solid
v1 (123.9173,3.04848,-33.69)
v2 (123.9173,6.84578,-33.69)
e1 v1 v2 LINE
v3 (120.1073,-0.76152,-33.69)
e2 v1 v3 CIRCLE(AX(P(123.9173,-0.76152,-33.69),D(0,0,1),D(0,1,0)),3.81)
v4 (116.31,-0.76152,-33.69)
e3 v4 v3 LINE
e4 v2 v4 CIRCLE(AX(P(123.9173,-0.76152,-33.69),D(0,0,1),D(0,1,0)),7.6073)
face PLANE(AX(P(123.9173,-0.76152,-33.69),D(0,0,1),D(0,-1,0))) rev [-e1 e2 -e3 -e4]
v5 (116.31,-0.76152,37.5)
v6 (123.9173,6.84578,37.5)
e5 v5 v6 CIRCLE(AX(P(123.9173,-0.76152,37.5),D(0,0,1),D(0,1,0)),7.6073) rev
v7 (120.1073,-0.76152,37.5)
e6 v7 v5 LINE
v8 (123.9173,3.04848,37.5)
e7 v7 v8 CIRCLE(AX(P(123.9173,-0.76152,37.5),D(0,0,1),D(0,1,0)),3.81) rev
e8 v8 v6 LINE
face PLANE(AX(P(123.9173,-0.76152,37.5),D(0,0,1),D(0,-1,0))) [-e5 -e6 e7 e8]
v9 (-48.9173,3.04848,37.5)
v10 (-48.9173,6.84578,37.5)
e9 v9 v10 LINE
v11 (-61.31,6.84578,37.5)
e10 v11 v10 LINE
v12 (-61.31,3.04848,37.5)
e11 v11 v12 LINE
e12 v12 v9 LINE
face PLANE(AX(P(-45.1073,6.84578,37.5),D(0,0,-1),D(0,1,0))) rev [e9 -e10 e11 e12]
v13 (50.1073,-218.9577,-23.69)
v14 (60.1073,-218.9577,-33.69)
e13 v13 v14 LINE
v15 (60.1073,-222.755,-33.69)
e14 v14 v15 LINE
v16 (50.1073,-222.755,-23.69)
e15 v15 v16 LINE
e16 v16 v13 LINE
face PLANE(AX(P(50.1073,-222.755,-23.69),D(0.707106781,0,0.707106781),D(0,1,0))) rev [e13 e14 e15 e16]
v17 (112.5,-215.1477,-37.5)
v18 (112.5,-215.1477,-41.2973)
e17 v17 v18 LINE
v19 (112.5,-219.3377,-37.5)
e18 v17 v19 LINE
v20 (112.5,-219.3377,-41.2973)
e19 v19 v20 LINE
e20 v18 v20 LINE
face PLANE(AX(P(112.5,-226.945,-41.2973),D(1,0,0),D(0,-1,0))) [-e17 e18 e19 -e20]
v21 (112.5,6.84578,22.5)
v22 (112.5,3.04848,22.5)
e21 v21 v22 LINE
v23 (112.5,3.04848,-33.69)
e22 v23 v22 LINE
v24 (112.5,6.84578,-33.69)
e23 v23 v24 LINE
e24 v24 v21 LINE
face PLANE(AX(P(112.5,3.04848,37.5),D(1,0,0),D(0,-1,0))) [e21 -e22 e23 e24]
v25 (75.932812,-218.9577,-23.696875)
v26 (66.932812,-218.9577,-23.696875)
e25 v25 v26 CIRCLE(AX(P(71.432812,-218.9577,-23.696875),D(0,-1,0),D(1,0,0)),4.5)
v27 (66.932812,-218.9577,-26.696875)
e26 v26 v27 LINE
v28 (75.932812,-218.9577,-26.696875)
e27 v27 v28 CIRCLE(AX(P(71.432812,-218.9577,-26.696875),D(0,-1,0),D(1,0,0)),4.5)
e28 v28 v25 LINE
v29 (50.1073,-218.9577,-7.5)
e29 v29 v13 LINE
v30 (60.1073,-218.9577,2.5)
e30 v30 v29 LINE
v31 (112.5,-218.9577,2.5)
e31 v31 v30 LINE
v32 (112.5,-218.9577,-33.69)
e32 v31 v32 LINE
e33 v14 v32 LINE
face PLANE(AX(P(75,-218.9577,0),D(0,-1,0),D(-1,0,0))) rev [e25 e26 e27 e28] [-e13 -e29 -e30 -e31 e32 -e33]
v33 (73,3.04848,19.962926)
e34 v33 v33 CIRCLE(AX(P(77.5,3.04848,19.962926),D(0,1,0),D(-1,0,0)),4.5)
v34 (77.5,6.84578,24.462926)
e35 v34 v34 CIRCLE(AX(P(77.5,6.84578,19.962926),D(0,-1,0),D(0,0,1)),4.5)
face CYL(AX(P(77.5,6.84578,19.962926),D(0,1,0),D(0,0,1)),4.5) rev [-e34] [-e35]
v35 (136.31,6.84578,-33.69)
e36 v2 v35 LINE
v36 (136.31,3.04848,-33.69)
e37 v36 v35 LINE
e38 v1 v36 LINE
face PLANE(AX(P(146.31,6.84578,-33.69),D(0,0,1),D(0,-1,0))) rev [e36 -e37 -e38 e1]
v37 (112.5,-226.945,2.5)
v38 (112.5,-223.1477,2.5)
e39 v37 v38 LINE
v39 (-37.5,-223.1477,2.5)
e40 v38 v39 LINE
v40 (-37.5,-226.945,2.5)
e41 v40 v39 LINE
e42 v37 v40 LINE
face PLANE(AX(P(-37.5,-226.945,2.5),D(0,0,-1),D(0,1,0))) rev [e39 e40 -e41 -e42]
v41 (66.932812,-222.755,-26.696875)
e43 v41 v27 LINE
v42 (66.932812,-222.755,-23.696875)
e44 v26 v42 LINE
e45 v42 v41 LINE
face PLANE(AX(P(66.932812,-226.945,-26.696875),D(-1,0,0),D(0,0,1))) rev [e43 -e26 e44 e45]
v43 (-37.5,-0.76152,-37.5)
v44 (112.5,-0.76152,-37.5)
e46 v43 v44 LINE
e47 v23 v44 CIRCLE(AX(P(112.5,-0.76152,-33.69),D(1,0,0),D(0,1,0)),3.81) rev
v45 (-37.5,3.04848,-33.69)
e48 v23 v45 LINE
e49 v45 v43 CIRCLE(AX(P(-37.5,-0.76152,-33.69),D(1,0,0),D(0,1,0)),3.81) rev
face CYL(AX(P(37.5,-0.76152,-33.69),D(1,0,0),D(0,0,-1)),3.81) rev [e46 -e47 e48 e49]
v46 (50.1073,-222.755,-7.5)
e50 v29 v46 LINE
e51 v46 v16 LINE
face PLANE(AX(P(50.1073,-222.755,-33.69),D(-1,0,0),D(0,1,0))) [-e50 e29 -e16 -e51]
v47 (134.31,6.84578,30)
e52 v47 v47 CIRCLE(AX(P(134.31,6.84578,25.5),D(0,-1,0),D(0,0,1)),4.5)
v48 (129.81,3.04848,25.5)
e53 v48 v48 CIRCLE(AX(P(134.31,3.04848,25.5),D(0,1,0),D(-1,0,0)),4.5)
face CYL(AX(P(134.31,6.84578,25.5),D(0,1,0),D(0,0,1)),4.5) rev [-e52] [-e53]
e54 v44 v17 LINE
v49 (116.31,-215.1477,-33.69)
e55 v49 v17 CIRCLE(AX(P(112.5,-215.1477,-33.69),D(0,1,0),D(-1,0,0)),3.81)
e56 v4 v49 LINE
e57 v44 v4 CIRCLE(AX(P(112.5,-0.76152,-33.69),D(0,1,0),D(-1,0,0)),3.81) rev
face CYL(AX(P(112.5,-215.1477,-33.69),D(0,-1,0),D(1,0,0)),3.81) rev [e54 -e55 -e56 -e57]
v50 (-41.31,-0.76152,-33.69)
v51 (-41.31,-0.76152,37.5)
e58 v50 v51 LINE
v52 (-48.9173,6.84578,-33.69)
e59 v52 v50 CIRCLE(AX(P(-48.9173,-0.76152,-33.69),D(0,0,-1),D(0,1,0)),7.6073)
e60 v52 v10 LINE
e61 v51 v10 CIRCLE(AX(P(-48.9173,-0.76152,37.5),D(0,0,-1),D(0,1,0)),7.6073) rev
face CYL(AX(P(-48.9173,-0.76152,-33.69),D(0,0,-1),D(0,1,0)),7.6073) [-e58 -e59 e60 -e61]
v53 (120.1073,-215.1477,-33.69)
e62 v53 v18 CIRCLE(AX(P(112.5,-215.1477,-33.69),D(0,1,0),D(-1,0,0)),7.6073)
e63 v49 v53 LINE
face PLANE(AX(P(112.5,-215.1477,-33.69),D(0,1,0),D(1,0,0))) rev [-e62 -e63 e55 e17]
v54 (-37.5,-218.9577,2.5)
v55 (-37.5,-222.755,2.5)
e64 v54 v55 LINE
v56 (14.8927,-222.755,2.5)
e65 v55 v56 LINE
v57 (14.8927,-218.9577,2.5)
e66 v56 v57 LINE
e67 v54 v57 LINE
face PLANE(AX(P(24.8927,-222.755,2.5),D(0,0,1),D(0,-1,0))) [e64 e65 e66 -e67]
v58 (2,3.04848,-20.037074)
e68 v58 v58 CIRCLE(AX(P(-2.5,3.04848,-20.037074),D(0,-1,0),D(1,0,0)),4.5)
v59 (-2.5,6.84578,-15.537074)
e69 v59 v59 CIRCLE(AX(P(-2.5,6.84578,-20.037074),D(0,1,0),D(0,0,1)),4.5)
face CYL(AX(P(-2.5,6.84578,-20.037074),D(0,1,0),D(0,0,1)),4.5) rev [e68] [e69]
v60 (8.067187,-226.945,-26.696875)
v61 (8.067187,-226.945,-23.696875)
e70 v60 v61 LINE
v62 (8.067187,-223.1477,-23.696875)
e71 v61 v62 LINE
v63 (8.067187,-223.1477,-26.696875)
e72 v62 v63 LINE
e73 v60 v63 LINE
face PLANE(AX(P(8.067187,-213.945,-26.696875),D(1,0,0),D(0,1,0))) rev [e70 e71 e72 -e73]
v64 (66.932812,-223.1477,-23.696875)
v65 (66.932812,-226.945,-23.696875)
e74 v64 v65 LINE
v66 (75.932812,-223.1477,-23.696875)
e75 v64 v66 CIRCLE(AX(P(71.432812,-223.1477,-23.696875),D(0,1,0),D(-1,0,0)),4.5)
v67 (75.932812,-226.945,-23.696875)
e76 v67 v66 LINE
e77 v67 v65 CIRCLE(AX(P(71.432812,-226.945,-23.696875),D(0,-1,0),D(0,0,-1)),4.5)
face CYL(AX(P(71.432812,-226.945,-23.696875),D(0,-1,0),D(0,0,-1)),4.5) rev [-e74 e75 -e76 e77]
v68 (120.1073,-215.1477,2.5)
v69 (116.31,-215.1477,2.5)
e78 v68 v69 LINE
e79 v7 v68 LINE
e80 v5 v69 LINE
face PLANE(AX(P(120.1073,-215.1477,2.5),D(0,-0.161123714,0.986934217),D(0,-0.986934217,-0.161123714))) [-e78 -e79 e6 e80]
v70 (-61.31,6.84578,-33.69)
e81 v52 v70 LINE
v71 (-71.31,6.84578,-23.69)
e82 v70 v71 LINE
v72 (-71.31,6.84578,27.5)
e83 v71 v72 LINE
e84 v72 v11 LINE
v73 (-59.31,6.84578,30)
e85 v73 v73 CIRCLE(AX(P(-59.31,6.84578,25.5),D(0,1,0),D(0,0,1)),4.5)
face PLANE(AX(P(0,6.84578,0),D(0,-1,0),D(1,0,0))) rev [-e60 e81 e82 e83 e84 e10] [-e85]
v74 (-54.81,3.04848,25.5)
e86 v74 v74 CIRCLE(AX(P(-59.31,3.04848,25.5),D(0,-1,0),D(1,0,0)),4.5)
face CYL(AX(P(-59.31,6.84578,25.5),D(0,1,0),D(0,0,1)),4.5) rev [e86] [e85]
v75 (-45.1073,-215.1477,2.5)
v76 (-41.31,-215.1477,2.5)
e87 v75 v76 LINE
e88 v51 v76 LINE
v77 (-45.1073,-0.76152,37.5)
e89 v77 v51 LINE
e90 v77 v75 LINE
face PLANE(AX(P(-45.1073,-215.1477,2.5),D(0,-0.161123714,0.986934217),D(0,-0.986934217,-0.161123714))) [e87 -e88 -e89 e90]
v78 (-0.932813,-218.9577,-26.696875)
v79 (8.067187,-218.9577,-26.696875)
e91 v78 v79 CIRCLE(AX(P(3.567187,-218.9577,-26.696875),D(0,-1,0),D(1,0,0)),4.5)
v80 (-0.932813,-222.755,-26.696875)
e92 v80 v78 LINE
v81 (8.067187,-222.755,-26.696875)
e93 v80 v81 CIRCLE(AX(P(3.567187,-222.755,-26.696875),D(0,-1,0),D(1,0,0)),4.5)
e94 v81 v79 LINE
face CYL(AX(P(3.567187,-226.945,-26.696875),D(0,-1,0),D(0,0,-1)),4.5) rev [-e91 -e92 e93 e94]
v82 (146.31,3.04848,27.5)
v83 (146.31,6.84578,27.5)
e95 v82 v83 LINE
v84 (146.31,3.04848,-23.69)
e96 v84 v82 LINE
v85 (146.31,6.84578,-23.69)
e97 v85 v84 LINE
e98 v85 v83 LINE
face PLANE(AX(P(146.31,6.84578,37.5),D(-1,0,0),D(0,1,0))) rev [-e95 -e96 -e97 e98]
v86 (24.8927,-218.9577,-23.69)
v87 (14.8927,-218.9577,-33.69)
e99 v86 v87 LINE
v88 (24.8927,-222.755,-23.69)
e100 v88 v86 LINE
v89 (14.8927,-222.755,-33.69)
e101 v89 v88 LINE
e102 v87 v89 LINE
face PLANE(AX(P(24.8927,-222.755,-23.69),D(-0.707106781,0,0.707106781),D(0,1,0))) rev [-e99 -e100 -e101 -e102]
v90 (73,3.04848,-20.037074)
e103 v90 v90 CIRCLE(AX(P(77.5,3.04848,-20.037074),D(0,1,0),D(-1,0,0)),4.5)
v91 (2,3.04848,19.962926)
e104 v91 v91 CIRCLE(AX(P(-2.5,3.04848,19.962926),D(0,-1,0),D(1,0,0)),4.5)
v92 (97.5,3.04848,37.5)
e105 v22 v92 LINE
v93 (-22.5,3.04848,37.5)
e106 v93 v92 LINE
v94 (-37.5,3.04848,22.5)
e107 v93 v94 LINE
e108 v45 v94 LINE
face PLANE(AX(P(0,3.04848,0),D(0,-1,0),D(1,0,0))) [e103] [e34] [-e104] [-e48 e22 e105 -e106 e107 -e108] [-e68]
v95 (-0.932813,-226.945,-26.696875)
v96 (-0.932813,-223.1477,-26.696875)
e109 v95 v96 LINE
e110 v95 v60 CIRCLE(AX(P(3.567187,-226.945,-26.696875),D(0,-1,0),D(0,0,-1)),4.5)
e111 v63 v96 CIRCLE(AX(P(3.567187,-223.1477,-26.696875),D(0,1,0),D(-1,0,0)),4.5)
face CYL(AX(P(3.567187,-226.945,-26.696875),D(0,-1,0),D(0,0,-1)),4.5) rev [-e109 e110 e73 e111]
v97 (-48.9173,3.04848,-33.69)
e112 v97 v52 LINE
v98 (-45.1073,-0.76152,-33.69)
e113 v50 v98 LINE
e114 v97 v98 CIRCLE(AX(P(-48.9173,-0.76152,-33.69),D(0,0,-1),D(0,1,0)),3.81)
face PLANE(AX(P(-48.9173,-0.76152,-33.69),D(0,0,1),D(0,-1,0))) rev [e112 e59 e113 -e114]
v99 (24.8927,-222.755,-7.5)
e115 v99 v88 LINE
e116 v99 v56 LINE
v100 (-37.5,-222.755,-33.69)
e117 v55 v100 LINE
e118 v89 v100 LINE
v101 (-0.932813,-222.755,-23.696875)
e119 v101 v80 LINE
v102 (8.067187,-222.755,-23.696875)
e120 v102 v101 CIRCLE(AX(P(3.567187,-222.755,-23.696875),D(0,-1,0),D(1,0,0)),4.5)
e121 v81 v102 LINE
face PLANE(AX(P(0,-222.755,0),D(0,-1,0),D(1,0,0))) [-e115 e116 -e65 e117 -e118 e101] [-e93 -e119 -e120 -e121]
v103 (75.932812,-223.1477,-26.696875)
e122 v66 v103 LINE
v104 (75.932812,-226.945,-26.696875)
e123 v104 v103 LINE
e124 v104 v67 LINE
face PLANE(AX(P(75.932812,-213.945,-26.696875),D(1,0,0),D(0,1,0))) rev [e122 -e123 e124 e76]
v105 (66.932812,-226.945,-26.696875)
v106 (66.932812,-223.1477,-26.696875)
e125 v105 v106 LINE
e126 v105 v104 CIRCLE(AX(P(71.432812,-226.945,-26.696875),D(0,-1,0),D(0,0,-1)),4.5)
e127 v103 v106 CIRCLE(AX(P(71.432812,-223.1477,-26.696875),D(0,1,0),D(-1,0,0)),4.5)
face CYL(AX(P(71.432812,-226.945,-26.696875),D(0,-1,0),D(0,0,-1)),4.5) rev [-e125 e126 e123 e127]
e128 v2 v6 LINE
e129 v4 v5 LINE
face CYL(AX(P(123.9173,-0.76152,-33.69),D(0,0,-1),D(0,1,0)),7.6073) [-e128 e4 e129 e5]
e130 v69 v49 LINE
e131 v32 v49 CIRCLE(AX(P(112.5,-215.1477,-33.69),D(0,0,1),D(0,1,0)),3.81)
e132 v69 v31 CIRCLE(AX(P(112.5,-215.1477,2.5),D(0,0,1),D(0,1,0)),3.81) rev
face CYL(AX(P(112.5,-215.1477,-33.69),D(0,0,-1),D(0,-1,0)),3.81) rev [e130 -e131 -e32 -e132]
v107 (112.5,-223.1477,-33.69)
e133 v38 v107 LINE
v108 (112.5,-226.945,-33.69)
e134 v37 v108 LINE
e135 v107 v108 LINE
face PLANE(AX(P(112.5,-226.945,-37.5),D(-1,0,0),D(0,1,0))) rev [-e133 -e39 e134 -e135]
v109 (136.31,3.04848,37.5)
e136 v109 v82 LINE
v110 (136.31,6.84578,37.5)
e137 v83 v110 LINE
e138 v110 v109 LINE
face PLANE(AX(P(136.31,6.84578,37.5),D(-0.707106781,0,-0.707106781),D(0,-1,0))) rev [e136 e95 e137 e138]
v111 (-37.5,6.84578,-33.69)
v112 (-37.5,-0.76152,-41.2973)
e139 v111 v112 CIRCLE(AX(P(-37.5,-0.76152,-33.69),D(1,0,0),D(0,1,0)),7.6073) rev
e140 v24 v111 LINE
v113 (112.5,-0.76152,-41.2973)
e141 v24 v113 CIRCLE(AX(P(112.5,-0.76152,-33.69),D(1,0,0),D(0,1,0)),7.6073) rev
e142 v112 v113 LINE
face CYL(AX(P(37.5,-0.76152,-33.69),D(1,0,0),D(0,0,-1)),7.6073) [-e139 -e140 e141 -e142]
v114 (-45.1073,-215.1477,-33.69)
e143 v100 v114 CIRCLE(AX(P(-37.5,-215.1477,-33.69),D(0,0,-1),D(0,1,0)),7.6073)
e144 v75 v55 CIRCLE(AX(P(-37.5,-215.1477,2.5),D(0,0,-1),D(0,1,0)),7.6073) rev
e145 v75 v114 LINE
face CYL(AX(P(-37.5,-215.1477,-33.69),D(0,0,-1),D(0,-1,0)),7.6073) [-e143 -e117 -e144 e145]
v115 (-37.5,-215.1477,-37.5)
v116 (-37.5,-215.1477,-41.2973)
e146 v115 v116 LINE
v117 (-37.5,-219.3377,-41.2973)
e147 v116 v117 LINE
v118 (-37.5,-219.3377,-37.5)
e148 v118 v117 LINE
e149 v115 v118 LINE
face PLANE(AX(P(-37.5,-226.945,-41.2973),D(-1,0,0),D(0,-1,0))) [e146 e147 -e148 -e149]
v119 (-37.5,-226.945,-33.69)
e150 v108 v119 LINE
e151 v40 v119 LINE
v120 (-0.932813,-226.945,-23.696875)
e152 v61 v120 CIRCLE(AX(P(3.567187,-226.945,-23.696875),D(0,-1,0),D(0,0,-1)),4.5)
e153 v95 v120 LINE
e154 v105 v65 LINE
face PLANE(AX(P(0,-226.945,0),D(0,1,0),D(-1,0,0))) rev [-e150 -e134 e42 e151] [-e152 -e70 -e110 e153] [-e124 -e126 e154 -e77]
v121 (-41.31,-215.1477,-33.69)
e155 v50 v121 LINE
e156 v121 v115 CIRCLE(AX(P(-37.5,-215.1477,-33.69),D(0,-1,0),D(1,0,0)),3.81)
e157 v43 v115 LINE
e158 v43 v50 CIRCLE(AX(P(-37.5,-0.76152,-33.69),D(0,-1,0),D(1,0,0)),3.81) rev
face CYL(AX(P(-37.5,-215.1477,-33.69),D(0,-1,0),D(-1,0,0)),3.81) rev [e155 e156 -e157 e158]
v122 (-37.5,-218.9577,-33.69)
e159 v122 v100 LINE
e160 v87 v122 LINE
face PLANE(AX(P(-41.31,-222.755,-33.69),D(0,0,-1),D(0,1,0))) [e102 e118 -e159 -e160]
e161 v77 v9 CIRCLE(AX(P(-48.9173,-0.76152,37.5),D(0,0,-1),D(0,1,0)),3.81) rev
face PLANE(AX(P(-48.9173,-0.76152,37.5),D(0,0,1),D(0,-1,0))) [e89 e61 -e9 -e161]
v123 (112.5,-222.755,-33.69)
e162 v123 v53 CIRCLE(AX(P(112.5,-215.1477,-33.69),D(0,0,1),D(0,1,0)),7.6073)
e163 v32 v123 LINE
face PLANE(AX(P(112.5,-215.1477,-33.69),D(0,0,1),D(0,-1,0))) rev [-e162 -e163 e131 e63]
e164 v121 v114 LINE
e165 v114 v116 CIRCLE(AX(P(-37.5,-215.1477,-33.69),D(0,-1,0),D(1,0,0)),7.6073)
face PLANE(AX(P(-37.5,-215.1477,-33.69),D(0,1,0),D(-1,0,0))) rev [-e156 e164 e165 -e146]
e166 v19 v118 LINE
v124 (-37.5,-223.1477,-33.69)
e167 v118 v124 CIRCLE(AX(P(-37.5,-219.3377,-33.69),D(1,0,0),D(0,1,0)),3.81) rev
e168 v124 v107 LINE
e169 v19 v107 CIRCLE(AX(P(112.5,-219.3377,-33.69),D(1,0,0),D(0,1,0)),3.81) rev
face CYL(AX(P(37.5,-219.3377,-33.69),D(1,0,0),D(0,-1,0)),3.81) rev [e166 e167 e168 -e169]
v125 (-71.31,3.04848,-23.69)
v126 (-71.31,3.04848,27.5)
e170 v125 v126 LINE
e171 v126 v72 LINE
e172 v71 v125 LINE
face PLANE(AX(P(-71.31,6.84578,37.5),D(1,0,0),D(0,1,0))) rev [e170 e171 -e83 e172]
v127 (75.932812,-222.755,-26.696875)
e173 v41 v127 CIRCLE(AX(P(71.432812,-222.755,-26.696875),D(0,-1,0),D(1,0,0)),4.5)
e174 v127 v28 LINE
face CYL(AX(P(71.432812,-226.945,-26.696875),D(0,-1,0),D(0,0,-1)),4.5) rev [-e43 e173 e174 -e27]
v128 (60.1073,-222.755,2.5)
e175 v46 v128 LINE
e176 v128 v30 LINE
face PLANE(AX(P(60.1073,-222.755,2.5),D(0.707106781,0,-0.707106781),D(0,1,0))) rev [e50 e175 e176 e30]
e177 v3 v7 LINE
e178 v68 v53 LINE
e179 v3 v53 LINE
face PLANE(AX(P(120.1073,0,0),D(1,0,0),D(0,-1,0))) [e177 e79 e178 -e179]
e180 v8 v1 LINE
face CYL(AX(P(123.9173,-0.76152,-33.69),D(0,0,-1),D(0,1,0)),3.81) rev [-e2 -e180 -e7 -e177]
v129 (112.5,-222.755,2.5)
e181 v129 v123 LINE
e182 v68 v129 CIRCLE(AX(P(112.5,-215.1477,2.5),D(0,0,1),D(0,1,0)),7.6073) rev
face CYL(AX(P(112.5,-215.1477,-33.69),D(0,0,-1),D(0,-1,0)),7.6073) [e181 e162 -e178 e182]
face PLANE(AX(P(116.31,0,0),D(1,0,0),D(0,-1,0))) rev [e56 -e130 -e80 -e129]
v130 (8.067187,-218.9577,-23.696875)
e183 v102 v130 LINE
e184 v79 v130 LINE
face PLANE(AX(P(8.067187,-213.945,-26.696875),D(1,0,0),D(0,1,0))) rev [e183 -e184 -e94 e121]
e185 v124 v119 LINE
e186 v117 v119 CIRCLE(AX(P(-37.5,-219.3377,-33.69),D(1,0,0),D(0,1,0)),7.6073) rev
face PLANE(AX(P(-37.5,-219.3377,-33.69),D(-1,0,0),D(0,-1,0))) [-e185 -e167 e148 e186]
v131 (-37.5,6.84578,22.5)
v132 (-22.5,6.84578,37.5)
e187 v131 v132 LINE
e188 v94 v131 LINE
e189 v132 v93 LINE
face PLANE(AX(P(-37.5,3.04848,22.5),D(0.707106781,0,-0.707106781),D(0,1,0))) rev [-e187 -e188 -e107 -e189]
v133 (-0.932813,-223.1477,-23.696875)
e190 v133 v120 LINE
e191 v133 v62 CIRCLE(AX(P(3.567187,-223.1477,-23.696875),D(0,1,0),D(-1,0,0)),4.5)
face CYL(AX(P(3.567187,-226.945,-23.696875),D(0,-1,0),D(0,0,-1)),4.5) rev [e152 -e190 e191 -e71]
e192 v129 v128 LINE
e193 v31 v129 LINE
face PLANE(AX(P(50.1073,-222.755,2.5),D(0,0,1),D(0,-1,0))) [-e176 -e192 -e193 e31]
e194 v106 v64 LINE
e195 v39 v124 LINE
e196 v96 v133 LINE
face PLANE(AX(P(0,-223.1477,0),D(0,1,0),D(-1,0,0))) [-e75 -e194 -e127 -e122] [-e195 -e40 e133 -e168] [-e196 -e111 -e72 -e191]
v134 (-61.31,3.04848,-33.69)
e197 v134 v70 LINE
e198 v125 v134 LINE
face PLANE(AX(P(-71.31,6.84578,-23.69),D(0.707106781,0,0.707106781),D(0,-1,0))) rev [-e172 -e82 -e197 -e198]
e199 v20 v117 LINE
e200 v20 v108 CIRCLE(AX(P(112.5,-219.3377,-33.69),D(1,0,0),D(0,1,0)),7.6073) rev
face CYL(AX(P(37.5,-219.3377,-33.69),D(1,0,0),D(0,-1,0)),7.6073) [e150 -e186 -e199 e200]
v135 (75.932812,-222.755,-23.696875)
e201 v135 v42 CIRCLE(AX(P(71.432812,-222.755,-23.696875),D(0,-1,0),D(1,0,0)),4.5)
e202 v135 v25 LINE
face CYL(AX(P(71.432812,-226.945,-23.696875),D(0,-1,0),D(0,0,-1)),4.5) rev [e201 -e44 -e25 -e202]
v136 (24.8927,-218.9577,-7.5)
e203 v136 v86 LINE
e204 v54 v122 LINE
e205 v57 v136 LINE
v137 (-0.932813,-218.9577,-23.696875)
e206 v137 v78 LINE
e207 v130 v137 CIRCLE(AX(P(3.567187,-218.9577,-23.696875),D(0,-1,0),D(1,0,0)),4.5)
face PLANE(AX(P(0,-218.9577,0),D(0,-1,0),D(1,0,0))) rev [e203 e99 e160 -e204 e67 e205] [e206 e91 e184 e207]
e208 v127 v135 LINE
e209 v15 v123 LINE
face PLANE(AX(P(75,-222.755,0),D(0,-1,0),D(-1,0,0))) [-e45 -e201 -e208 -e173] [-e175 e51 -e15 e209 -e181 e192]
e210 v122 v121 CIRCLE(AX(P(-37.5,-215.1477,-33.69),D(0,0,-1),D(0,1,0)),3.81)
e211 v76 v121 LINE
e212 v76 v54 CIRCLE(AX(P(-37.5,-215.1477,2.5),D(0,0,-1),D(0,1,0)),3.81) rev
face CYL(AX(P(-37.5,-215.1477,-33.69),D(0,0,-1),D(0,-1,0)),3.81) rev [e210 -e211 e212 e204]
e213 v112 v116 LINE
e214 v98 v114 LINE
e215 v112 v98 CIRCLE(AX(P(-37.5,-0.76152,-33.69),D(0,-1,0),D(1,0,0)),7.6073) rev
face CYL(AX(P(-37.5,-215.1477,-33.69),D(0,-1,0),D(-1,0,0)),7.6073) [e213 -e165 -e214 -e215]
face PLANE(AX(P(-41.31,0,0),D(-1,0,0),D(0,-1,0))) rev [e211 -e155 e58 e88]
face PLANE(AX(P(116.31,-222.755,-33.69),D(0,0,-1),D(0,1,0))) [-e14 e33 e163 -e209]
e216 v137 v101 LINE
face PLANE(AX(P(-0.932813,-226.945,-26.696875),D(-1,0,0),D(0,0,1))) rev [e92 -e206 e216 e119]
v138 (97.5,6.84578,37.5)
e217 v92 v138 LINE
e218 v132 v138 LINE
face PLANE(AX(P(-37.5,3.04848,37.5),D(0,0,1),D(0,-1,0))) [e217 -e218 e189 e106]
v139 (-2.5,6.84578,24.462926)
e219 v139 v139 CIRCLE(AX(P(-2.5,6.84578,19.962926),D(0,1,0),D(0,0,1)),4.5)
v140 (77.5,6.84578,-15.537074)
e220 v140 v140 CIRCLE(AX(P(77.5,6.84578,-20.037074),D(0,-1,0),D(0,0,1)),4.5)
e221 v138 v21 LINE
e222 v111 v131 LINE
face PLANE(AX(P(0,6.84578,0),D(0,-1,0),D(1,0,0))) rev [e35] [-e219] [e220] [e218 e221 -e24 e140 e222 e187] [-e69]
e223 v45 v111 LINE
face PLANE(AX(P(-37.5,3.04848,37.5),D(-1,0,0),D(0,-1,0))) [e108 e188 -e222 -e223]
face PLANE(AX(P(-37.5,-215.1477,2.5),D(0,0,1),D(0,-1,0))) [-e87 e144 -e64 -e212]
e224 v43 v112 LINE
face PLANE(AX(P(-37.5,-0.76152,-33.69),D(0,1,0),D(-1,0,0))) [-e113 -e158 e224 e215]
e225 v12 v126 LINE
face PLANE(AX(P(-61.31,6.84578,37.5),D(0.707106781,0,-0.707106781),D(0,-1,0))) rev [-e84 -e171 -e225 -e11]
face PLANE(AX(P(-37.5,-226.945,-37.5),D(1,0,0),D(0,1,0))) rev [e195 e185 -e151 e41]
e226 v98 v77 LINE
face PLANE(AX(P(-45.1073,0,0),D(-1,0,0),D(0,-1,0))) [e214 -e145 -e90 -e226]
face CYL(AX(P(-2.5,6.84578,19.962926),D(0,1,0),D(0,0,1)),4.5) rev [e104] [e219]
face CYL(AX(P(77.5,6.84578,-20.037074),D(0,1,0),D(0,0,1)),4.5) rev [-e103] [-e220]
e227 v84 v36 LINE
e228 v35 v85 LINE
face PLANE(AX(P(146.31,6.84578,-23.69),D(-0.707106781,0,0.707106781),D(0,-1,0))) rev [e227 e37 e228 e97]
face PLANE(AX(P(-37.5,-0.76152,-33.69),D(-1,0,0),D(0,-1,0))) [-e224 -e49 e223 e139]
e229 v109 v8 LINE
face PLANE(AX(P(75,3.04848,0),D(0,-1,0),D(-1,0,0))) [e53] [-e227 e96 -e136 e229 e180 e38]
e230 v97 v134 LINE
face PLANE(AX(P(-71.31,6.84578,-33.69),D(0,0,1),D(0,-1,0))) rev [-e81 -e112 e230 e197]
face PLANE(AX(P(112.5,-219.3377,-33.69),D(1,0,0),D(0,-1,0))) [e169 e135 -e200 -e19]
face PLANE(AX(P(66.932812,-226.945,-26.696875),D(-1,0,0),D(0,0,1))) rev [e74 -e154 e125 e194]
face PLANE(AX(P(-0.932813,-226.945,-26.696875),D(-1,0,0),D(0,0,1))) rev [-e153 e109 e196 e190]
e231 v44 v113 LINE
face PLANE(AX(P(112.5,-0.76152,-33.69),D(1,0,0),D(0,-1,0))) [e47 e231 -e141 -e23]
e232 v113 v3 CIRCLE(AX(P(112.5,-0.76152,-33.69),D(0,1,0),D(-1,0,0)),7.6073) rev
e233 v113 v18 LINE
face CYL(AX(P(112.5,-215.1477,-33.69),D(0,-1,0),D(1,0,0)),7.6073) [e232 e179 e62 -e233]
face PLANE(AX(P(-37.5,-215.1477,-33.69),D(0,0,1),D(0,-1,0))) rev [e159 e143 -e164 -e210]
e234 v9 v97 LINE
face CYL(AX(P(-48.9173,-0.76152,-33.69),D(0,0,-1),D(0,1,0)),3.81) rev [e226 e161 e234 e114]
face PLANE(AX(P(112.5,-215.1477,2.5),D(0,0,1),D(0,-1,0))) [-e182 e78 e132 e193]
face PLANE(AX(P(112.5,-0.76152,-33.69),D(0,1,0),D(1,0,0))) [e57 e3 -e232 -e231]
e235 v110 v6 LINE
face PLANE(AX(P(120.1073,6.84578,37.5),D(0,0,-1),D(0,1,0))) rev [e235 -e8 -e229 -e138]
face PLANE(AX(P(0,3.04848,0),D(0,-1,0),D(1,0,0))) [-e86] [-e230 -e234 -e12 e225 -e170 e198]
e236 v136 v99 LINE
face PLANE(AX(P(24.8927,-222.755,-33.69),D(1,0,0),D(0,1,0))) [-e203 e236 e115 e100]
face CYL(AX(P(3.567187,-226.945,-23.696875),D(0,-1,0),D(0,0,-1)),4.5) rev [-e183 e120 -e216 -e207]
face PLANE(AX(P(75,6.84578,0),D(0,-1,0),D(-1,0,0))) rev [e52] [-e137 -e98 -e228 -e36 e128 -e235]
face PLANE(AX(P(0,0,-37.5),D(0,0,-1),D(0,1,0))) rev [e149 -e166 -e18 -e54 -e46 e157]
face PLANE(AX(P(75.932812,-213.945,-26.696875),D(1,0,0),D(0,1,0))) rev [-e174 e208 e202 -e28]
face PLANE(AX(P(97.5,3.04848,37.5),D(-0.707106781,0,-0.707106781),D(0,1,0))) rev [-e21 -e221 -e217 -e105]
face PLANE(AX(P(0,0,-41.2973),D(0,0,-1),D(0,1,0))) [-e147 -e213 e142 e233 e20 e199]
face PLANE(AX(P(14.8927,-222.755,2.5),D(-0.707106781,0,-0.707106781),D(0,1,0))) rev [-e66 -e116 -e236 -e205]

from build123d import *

# Parameters (mm, degrees)
SKETCH1_W                    = 75
SKETCH1_H                    = 75
BASE_FLANGE1_DEPTH           = 3.7973
EDGE_FLANGE1_STRIP_W         = 22.8092
EDGE_FLANGE1_STRIP_H         = 3.7973
EDGE_FLANGE1_STRIP_CUT_DEPTH = 75
EDGE_FLANGE1_DEPTH           = 75
EDGE_FLANGE2_STRIP_W         = 22.8092
EDGE_FLANGE2_STRIP_H         = 3.7973
EDGE_FLANGE2_STRIP_CUT_DEPTH = 75
EDGE_FLANGE2_DEPTH           = 75
EDGE_FLANGE3_DEPTH           = 214.38618
EDGE_FLANGE3_START           = -3.7973
EDGE_FLANGE3_FLAT_DEPTH      = 3.7973
EDGE_FLANGE4_DEPTH           = 71.19
EDGE_FLANGE5_DEPTH           = 36.19
BREAK_CORNER1_START          = -222.755
BREAK_CORNER1_DEPTH          = 3.7973
BREAK_CORNER2_START          = -74.246212025
BREAK_CORNER2_OUTLINE_W      = 51.869221049
BREAK_CORNER2_OUTLINE_H      = 3.7973
BREAK_CORNER2_DEPTH          = 7.071067812
BREAK_CORNER2_START_2        = -30.978348084
BREAK_CORNER2_2_OUTLINE_W    = 7.130778951
BREAK_CORNER2_2_OUTLINE_H    = 3.7973
BREAK_CORNER2_2_DEPTH        = 14.142135624
M8_CLEARANCE_HOLE1_D         = 9
M8_CLEARANCE_HOLE1_DEPTH     = 13
M8_CLEARANCE_HOLE1_TIP       = 2.703872786
BREAK_CORNER3_START          = 3.04848
BREAK_CORNER3_DEPTH          = 3.7973
M8_START                     = -226.945
M8_CLEARANCE_SLOT1_DEPTH     = 7.9873


# Read off the part's stored shape, not the designer's step: Break-Corner1, Break-Corner2, Break-Corner3, M8 Clearance Slot1
# Sheet-metal steps are written as plain solids
with BuildPart() as part:
    # Sketch1 → Base-Flange1 (new body)
    with BuildSketch(Plane(origin=(0, 6.84578, 0), x_dir=(1, 0, 0), z_dir=(0, 1, 0))):
        Rectangle(SKETCH1_W, SKETCH1_H)
    extrude(amount=-BASE_FLANGE1_DEPTH)

    # Edge-Flange1 strip (across the edge) → Edge-Flange1 strip cut (cut)
    with BuildSketch(Plane(origin=(-37.5, 3.04848, -37.5), x_dir=(0, 0, 1), z_dir=(1, 0, 0))):
        with Locations((-7.5946, -1.89865)):
            Rectangle(EDGE_FLANGE1_STRIP_W, EDGE_FLANGE1_STRIP_H)
    extrude(amount=EDGE_FLANGE1_STRIP_CUT_DEPTH, mode=Mode.SUBTRACT)

    # Edge-Flange1 section (across the edge) → Edge-Flange1 (add)
    with BuildSketch(Plane(origin=(-37.5, 3.04848, -37.5), x_dir=(0, 0, 1), z_dir=(1, 0, 0))):
        with BuildLine():
            Line((-3.7973, 3.81), (-3.7973, 229.99348))
            Line((-3.7973, 229.99348), (0, 229.99348))
            Line((0, 229.99348), (0, 3.81))
            ThreePointArc((0, 3.81), (1.115923164, 1.115923164), (3.81, 0))
            Line((3.81, 0), (3.81, -3.7973))
            ThreePointArc((3.81, -3.7973), (-1.569173417, -1.569173417), (-3.7973, 3.81))
        make_face()
    extrude(amount=EDGE_FLANGE1_DEPTH)

    # Edge-Flange2 strip (across the edge) → Edge-Flange2 strip cut (cut)
    with BuildSketch(Plane(origin=(-37.5, -226.945, -37.5), x_dir=(0, 1, 0), z_dir=(1, 0, 0))):
        with Locations((-3.7973, -1.89865)):
            Rectangle(EDGE_FLANGE2_STRIP_W, EDGE_FLANGE2_STRIP_H)
    extrude(amount=EDGE_FLANGE2_STRIP_CUT_DEPTH, mode=Mode.SUBTRACT)

    # Edge-Flange2 section (across the edge) → Edge-Flange2 (add)
    with BuildSketch(Plane(origin=(-37.5, -226.945, -37.5), x_dir=(0, 1, 0), z_dir=(1, 0, 0))):
        with BuildLine():
            Line((0, 3.81), (0, 40))
            Line((0, 40), (3.7973, 40))
            Line((3.7973, 40), (3.7973, 3.81))
            ThreePointArc((3.7973, 3.81), (4.913223164, 1.115923164), (7.6073, 0))
            Line((7.6073, 0), (7.6073, -3.7973))
            ThreePointArc((7.6073, -3.7973), (2.228126583, -1.569173417), (0, 3.81))
        make_face()
    extrude(amount=EDGE_FLANGE2_DEPTH)

    # Edge-Flange3 bend section (across the edge) → Edge-Flange3 (add)
    with BuildSketch(Plane(origin=(-41.31, -0.76152, -37.5), x_dir=(1, 0, 0), z_dir=(0, -1, 0))):
        with BuildLine():
            Line((-3.7973, 3.81), (0, 3.81))
            ThreePointArc((0, 3.81), (1.115923164, 1.115923164), (3.81, 0))
            Line((3.81, 0), (3.81, -3.7973))
            ThreePointArc((3.81, -3.7973), (-1.569173417, -1.569173417), (-3.7973, 3.81))
        make_face()
    extrude(amount=EDGE_FLANGE3_DEPTH)

    # Edge-Flange3 profile (on flange) → Edge-Flange3 flat (add)
    with BuildSketch(Plane(origin=(-41.31, 0, -37.5), x_dir=(0, 1, 0), z_dir=(1, 0, 0)).offset(EDGE_FLANGE3_START)):
        Polygon((-215.1477, 3.81), (-0.76152, 3.81), (-0.76152, 75), (-215.1477, 40), align=None)
    extrude(amount=EDGE_FLANGE3_FLAT_DEPTH)

    # Edge-Flange4 section (across the edge) → Edge-Flange4 (add)
    with BuildSketch(Plane(origin=(-45.1073, 3.04848, 37.5), x_dir=(0, -1, 0), z_dir=(0, 0, -1))):
        with BuildLine():
            Line((-3.7973, 3.81), (-3.7973, 26.2027))
            Line((-3.7973, 26.2027), (0, 26.2027))
            Line((0, 26.2027), (0, 3.81))
            ThreePointArc((0, 3.81), (1.115923164, 1.115923164), (3.81, 0))
            Line((3.81, 0), (3.81, -3.7973))
            ThreePointArc((3.81, -3.7973), (-1.569173417, -1.569173417), (-3.7973, 3.81))
        make_face()
    extrude(amount=EDGE_FLANGE4_DEPTH)

    # Edge-Flange5 section (across the edge) → Edge-Flange5 (add)
    with BuildSketch(Plane(origin=(-41.31, -218.9577, 2.5), x_dir=(0, 1, 0), z_dir=(0, 0, -1))):
        with BuildLine():
            Line((-3.7973, 3.81), (-3.7973, 66.2027))
            Line((-3.7973, 66.2027), (0, 66.2027))
            Line((0, 66.2027), (0, 3.81))
            ThreePointArc((0, 3.81), (1.115923164, 1.115923164), (3.81, 0))
            Line((3.81, 0), (3.81, -3.7973))
            ThreePointArc((3.81, -3.7973), (-1.569173417, -1.569173417), (-3.7973, 3.81))
        make_face()
    extrude(amount=EDGE_FLANGE5_DEPTH)

    # Break-Corner1 outline → Break-Corner1 (cut)
    with BuildSketch(Plane(origin=(0, 0, 0), x_dir=(1, 0, 0), z_dir=(0, 1, 0)).offset(BREAK_CORNER1_START)):
        Polygon((24.8927, -2.5), (24.8927, 7.5), (14.8927, -2.5), align=None)
        Polygon((14.8927, 33.69), (24.8927, 23.69), (24.8927, 33.69), align=None)
    extrude(amount=BREAK_CORNER1_DEPTH, mode=Mode.SUBTRACT)

    # Break-Corner2 outline → Break-Corner2 (cut)
    with BuildSketch(Plane(origin=(0, 0, 0), x_dir=(0.707106781186549, 0, -0.707106781186546), z_dir=(0.707106781186546, 0, 0.707106781186549)).offset(BREAK_CORNER2_START)):
        with Locations((-43.934610525, 4.94713)):
            Rectangle(BREAK_CORNER2_OUTLINE_W, BREAK_CORNER2_OUTLINE_H)
    extrude(amount=BREAK_CORNER2_DEPTH, mode=Mode.SUBTRACT)

    # Break-Corner2 2 outline → Break-Corner2 2 (cut)
    with BuildSketch(Plane(origin=(0, 0, 0), x_dir=(0.707106781186549, 0, -0.707106781186546), z_dir=(0.707106781186546, 0, 0.707106781186549)).offset(BREAK_CORNER2_START_2)):
        with Locations((-73.434610525, 4.94713)):
            Rectangle(BREAK_CORNER2_2_OUTLINE_W, BREAK_CORNER2_2_OUTLINE_H)
    extrude(amount=BREAK_CORNER2_2_DEPTH, mode=Mode.SUBTRACT)

    # M8 Clearance Hole1
    with Locations(Plane(origin=(0, 6.84578, 0), x_dir=(1, 0, 0), z_dir=(0, 1, 0))):
        with Locations((-2.5, -19.962925734), (-2.5, 20.037074266), (-59.31, -25.5)):
            Hole(M8_CLEARANCE_HOLE1_D / 2, depth=M8_CLEARANCE_HOLE1_DEPTH)
            with Locations((0, 0, -(M8_CLEARANCE_HOLE1_DEPTH + M8_CLEARANCE_HOLE1_TIP / 2))):  # 118° drill point
                Cone(0, M8_CLEARANCE_HOLE1_D / 2, M8_CLEARANCE_HOLE1_TIP, mode=Mode.SUBTRACT)

    # Mirror1: part across plane


with BuildPart() as part_1:
    add(part.part)
    add(part.part.mirror(Plane(origin=(37.5, 3.04848, -41.2973), x_dir=(0, 0, 1), z_dir=(1, 0, 0))))

    # Break-Corner3 outline → Break-Corner3 (cut)
    with BuildSketch(Plane(origin=(0, 0, 0), x_dir=(1, 0, 0), z_dir=(0, 1, 0)).offset(BREAK_CORNER3_START)):
        Polygon((-37.5, -37.5), (-22.5, -37.5), (-37.5, -22.5), align=None)
        Polygon((112.5, -22.5), (97.5, -37.5), (112.5, -37.5), align=None)
    extrude(amount=BREAK_CORNER3_DEPTH, mode=Mode.SUBTRACT)

    # M8 Clearance Slot1 outline → M8 Clearance Slot1 (cut)
    with BuildSketch(Plane(origin=(0, 0, 0), x_dir=(1, 0, 0), z_dir=(0, 1, 0)).offset(M8_START)):
        with BuildLine():
            ThreePointArc((-0.9328125, 23.696875), (3.5671875, 19.196875), (8.0671875, 23.696875))
            Line((8.0671875, 23.696875), (8.0671875, 26.696875))
            ThreePointArc((8.0671875, 26.696875), (3.5671875, 31.196875), (-0.9328125, 26.696875))
            Line((-0.9328125, 26.696875), (-0.9328125, 23.696875))
        make_face()
        with BuildLine():
            ThreePointArc((66.9328125, 23.696875), (71.4328125, 19.196875), (75.9328125, 23.696875))
            Line((75.9328125, 23.696875), (75.9328125, 26.696875))
            ThreePointArc((75.9328125, 26.696875), (71.4328125, 31.196875), (66.9328125, 26.696875))
            Line((66.9328125, 26.696875), (66.9328125, 23.696875))
        make_face()
    extrude(amount=M8_CLEARANCE_SLOT1_DEPTH, mode=Mode.SUBTRACT)


solid = part_1.part
